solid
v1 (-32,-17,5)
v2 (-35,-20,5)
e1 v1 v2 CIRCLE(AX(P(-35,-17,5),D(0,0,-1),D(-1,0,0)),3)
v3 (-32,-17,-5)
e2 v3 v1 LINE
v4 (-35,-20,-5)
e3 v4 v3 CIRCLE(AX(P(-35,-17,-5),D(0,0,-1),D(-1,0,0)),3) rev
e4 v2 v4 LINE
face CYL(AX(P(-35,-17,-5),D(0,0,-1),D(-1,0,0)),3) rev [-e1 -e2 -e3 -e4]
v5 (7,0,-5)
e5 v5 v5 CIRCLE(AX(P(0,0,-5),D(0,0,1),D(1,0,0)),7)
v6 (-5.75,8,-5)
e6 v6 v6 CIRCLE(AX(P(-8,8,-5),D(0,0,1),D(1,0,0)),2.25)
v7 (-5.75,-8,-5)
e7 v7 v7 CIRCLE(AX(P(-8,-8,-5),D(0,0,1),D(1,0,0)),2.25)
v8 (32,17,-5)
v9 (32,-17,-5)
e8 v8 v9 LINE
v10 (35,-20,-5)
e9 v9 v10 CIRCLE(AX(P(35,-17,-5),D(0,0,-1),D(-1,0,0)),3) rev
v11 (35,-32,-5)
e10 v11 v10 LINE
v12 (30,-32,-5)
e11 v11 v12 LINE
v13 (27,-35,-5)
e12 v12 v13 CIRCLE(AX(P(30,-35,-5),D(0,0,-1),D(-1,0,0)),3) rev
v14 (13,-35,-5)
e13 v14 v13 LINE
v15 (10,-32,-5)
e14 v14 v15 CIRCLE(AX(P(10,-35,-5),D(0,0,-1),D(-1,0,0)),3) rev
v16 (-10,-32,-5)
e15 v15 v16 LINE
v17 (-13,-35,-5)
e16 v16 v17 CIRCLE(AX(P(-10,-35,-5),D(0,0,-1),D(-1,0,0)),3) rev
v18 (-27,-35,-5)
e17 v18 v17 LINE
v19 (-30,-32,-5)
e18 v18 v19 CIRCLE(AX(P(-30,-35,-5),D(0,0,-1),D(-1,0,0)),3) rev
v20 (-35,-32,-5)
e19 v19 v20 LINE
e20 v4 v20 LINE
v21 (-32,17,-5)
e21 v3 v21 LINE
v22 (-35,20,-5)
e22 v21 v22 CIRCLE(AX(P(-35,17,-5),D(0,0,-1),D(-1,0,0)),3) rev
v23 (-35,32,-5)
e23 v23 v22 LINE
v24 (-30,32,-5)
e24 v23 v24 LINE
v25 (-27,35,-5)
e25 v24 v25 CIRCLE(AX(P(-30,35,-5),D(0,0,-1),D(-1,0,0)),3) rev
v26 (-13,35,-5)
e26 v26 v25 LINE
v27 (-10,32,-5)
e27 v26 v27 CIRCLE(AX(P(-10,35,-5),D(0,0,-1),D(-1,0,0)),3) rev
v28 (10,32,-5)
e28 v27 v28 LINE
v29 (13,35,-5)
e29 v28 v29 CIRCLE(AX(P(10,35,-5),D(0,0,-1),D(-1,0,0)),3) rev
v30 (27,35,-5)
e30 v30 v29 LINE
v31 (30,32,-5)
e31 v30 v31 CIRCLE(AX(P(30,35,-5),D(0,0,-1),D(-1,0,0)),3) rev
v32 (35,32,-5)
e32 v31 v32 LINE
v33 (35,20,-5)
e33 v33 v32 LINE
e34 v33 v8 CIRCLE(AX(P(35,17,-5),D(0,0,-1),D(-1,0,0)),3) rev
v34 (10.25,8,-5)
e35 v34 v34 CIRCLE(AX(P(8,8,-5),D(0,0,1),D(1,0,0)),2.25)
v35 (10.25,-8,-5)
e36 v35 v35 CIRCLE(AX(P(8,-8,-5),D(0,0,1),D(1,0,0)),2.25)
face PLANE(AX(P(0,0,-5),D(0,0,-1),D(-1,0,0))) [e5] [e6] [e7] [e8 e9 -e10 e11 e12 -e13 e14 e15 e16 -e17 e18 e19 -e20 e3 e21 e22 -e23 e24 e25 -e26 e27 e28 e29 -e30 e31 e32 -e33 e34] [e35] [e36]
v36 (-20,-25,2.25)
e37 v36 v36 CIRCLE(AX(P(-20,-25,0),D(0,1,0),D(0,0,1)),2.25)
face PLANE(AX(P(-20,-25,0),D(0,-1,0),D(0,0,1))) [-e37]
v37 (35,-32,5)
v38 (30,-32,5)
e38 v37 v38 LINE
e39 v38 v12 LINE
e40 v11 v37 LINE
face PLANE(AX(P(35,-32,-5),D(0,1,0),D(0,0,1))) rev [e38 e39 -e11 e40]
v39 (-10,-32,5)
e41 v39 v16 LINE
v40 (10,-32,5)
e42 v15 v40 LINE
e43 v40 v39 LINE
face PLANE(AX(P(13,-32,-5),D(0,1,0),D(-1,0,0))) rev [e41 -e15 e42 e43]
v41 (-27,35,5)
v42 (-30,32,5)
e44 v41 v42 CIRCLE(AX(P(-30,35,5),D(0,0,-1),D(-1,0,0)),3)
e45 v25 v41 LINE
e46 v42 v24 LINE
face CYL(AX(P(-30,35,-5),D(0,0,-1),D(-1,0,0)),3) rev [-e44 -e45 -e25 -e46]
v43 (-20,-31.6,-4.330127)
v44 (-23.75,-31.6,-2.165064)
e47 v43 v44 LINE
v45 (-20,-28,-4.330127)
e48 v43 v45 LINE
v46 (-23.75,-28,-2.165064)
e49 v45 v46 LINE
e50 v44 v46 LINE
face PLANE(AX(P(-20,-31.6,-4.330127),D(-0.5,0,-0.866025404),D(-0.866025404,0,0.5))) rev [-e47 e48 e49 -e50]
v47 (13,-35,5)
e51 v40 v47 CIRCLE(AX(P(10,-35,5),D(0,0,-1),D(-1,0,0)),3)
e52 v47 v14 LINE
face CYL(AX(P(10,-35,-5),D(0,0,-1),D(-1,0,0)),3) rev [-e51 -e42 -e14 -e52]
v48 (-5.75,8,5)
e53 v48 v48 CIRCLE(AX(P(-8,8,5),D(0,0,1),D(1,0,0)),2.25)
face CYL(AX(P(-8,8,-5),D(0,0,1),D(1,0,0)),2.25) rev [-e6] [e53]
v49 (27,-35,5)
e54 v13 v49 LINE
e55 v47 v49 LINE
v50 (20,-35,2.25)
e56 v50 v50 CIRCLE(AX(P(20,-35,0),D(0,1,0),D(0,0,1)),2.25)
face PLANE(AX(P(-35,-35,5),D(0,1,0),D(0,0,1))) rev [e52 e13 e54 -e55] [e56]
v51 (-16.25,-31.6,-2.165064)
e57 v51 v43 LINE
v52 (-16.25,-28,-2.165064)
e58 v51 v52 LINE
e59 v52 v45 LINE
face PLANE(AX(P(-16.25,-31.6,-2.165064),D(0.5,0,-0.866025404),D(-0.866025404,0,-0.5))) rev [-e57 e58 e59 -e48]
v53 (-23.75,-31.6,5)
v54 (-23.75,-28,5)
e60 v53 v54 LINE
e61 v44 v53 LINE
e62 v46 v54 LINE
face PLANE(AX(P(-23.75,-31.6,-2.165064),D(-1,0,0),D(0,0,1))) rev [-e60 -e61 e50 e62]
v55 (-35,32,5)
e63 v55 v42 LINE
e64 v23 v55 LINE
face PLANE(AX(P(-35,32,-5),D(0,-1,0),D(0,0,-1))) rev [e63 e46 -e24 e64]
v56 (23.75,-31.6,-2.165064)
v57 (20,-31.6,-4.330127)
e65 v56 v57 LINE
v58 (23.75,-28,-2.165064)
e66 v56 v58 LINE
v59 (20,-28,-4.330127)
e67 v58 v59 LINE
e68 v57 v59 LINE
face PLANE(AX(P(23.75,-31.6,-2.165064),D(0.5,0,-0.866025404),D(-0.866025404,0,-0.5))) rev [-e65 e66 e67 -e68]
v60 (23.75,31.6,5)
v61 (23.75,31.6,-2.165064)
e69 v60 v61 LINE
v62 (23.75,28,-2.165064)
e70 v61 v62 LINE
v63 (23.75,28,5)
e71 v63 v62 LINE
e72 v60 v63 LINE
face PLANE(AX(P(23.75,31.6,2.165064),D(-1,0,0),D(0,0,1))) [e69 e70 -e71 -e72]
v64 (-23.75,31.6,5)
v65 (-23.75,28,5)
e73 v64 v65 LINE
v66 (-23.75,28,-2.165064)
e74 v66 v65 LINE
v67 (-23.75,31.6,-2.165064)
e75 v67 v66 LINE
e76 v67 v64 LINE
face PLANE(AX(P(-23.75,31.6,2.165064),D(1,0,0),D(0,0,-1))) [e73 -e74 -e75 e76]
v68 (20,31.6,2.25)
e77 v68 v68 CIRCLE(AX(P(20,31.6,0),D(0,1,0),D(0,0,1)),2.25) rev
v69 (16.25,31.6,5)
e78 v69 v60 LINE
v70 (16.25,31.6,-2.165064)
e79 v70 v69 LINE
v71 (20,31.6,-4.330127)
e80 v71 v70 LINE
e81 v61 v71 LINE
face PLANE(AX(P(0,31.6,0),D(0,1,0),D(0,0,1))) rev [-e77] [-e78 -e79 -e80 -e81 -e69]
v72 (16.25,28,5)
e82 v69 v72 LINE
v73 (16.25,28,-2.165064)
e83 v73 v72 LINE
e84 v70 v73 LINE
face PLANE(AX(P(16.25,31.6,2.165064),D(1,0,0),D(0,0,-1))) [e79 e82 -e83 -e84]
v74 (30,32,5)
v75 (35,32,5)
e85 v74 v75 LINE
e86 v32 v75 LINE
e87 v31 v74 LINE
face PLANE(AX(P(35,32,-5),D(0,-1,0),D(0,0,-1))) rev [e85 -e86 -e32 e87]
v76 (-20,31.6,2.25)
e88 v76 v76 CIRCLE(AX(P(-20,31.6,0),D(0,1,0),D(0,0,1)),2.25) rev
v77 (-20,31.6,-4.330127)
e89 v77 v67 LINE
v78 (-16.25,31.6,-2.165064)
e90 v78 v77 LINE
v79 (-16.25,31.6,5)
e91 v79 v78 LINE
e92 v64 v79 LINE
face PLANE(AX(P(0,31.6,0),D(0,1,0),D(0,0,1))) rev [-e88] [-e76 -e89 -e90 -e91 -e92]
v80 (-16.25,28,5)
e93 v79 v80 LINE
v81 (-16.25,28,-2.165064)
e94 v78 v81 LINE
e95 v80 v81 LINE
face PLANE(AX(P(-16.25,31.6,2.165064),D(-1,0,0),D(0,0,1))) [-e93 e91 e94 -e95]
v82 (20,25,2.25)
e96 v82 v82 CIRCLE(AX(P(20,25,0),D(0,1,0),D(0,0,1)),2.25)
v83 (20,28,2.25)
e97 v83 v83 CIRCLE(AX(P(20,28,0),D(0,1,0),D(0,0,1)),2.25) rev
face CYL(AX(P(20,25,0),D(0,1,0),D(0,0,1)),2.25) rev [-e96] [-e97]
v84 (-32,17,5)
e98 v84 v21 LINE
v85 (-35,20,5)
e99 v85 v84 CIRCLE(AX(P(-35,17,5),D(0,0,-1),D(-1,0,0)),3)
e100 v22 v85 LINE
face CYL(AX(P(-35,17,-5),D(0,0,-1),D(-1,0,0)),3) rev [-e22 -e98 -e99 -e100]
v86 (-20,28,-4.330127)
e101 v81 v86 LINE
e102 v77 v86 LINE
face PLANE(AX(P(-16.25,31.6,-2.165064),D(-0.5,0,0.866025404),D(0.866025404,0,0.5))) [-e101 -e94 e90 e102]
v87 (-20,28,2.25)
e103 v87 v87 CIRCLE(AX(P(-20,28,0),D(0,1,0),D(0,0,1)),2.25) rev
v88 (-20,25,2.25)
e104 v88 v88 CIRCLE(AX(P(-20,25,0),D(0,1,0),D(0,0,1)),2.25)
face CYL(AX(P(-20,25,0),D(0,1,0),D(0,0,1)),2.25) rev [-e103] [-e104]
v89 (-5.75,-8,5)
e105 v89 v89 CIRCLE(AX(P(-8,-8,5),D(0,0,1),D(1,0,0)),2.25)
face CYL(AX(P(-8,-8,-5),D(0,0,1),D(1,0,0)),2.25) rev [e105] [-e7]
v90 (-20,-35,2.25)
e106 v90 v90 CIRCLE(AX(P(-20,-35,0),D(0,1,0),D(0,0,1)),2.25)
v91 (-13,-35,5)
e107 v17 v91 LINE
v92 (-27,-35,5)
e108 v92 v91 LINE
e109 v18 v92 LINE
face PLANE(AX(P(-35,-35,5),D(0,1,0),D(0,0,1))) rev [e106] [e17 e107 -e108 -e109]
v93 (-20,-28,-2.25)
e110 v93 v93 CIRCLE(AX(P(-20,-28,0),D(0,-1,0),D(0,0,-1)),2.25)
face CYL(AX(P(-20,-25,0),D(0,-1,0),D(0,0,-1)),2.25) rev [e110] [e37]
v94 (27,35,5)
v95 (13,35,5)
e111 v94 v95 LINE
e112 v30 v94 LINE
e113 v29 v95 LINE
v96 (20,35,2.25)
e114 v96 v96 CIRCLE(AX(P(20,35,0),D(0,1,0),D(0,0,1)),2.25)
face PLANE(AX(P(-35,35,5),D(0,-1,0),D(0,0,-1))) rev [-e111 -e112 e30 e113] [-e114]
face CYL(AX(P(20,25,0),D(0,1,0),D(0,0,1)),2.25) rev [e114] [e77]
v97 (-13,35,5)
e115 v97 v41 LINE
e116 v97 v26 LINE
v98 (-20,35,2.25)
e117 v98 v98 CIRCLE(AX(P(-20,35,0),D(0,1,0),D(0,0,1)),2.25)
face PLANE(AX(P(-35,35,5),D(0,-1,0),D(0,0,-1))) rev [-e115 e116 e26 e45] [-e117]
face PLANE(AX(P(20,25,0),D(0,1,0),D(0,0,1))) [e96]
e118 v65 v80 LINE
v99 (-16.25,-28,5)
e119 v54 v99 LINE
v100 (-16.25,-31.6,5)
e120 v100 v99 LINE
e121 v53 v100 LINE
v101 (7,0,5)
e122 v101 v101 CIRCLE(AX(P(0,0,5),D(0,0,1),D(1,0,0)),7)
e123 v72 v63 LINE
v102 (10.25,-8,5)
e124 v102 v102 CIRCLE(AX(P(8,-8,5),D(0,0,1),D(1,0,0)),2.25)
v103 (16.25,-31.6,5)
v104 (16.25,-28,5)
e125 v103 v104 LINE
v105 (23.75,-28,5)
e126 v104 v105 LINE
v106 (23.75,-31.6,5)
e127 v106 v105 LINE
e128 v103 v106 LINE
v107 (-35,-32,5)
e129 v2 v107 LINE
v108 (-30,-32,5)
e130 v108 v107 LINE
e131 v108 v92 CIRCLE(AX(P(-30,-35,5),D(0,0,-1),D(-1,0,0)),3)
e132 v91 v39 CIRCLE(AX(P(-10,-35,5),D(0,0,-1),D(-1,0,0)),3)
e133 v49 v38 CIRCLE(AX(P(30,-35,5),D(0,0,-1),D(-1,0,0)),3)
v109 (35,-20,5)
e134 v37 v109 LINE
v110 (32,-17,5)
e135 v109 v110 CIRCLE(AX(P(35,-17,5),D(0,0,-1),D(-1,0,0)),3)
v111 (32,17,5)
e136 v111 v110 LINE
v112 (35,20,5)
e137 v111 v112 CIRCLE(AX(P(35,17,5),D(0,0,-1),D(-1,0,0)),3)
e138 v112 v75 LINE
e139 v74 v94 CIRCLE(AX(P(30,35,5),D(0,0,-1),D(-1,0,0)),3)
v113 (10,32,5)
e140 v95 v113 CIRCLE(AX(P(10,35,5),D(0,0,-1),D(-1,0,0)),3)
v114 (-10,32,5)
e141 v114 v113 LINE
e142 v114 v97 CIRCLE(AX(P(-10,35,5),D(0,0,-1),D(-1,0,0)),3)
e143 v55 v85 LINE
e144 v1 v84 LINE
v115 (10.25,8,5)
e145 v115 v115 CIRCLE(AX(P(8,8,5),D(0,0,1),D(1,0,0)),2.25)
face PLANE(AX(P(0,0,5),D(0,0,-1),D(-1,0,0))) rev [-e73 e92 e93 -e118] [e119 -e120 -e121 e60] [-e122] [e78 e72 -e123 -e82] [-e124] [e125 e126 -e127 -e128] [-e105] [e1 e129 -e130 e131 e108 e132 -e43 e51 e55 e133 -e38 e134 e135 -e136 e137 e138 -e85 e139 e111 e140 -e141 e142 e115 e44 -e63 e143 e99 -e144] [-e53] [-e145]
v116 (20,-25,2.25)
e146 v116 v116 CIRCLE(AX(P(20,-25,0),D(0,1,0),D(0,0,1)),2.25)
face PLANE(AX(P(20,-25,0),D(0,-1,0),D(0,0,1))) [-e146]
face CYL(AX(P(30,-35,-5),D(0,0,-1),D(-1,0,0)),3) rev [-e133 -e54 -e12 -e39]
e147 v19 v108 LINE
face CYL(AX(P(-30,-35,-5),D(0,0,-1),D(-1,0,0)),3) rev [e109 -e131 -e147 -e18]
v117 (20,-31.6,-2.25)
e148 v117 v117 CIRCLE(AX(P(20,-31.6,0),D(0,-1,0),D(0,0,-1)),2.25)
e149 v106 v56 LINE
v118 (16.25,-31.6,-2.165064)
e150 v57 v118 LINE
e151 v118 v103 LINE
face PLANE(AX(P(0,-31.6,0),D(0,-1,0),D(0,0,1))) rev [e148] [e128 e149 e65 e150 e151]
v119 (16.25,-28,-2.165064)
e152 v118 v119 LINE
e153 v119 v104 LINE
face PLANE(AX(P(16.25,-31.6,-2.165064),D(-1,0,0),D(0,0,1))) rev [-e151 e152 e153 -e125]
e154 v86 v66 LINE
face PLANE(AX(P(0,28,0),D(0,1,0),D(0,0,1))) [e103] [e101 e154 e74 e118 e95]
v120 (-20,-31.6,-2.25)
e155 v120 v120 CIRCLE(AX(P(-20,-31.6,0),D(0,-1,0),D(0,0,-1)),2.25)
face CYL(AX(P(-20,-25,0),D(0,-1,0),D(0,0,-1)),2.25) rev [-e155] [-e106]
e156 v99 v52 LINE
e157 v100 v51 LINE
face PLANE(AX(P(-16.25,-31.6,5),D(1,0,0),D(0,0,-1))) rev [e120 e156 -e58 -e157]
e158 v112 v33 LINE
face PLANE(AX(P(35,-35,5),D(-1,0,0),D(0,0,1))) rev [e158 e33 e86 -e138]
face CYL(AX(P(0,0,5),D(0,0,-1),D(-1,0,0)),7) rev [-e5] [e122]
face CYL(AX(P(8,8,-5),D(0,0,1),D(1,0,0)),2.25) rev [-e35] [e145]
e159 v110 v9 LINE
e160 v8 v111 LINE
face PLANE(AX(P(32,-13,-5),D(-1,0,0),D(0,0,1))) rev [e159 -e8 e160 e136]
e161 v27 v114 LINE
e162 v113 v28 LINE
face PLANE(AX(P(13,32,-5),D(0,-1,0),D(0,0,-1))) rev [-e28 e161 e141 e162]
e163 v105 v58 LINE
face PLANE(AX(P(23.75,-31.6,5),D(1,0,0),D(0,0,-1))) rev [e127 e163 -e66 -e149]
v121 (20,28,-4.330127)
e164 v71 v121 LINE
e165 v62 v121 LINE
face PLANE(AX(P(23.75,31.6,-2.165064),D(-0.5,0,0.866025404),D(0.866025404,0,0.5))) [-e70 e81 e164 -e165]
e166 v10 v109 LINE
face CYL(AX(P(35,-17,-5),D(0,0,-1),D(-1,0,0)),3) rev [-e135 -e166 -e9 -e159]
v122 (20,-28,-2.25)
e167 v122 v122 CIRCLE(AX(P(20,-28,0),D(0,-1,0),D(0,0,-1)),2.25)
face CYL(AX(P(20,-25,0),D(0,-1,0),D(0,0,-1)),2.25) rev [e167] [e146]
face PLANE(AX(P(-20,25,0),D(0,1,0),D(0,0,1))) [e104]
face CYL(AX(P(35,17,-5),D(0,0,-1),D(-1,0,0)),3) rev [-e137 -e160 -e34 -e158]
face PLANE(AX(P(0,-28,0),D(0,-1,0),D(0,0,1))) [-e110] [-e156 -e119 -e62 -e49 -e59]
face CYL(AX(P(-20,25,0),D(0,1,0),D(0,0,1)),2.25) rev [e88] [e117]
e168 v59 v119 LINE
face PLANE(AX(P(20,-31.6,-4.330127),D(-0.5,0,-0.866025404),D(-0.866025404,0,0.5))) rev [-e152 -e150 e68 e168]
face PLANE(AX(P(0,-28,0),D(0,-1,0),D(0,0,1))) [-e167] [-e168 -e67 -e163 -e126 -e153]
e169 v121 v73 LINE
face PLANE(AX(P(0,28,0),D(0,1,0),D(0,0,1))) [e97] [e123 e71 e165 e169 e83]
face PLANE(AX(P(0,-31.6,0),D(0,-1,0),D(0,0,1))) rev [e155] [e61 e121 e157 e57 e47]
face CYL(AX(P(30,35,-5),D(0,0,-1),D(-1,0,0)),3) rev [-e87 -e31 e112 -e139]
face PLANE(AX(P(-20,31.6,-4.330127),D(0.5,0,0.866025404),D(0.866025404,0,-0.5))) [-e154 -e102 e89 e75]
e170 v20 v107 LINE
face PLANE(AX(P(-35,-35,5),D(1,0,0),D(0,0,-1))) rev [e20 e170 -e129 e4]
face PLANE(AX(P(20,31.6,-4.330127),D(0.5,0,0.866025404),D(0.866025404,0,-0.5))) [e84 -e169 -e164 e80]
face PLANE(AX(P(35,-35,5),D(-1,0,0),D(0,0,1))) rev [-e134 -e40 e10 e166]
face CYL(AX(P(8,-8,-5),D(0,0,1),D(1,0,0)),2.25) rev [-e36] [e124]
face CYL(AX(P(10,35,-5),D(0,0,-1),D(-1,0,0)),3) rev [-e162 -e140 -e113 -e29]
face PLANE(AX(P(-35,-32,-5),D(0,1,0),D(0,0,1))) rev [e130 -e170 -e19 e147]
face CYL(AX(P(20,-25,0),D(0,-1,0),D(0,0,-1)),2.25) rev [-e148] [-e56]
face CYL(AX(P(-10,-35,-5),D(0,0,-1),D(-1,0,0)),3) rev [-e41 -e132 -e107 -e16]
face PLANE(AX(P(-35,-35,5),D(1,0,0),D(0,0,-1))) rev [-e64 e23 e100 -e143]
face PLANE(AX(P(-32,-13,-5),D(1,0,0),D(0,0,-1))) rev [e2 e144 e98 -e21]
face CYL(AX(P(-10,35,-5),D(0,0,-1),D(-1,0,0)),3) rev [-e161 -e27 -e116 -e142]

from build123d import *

# Parameters (mm, degrees)
CROQUIS1_W              = 70
CROQUIS1_H              = 70
CROQUIS1_R              = 7
SALIENTE_EXTRUIR1_DEPTH = 5
CROQUIS2_R              = 2.25
CROQUIS2_W              = 26
CROQUIS2_H              = 6
CROQUIS2_W_2            = 6
CROQUIS2_H_2            = 26
CORTAR_EXTRUIR1_DEPTH   = 51.497524692
CROQUIS4_R              = 2.25
CORTAR_EXTRUIR2_DEPTH   = 10
CORTAR_EXTRUIR3_DEPTH   = 3.6
CROQUIS6_W              = 8
CROQUIS6_H              = 3
CROQUIS6_W_2            = 6
CROQUIS6_H_2            = 40
CORTAR_EXTRUIR4_DEPTH   = 51.497524692
REDONDEO1_R             = 3


with BuildPart() as part:
    # Croquis1 → Saliente-Extruir1 (new, symmetric)
    with BuildSketch(Plane.XY):
        Rectangle(CROQUIS1_W, CROQUIS1_H)
        Circle(CROQUIS1_R, mode=Mode.SUBTRACT)
    extrude(amount=SALIENTE_EXTRUIR1_DEPTH, both=True)

    # Croquis2 → Cortar-Extruir1 (cut, through all)
    with BuildSketch(Plane.XY.offset(5)):
        with Locations((8, 8)):
            Circle(CROQUIS2_R)
        with Locations((8, -8)):
            Circle(CROQUIS2_R)
        with Locations((-8, -8)):
            Circle(CROQUIS2_R)
        with Locations((-8, 8)):
            Circle(CROQUIS2_R)
        with Locations((0, 35)):
            Rectangle(CROQUIS2_W, CROQUIS2_H)
        with Locations((-35, 0)):
            Rectangle(CROQUIS2_W_2, CROQUIS2_H_2)
        with Locations((35, 0)):
            Rectangle(CROQUIS2_W_2, CROQUIS2_H_2)
        with Locations((0, -35)):
            Rectangle(CROQUIS2_W, CROQUIS2_H)
    extrude(amount=-CORTAR_EXTRUIR1_DEPTH, mode=Mode.SUBTRACT)

    # Croquis4 → Cortar-Extruir2 (cut)
    with BuildSketch(Plane(origin=(0, 35, 0), x_dir=(1, 0, 0), z_dir=(0, 1, 0))):
        with Locations(Location((-20, 0, 0), (0, 0, 270))):
            Circle(CROQUIS4_R)
        with Locations(Location((20, 0, 0), (0, 0, 270))):
            Circle(CROQUIS4_R)
    cortar_extruir2 = extrude(amount=-CORTAR_EXTRUIR2_DEPTH, mode=Mode.SUBTRACT)

    # Croquis5 → Cortar-Extruir3 (cut)
    with BuildSketch(Plane(origin=(0, 28, 0), x_dir=(1, 0, 0), z_dir=(0, 1, 0))):
        Polygon((-23.75, -2.165063509), (-23.75, -5), (-16.25, -5), (-16.25, -2.165063509), (-16.25, 2.165063509), (-20, 4.330127019), (-23.75, 2.165063509), align=None)
        Polygon((16.25, 2.165063509), (16.25, -2.165063509), (16.25, -5), (23.75, -5), (23.75, -2.165063509), (23.75, 2.165063509), (20, 4.330127019), align=None)
    cortar_extruir3 = extrude(amount=CORTAR_EXTRUIR3_DEPTH, mode=Mode.SUBTRACT)

    # Simetría1: Cortar-Extruir2, Cortar-Extruir3 across plane
    add(cortar_extruir2.mirror(Plane.ZX), mode=Mode.SUBTRACT)
    add(cortar_extruir3.mirror(Plane.ZX), mode=Mode.SUBTRACT)

    # Croquis6 → Cortar-Extruir4 (cut, through all)
    with BuildSketch(Plane.XY.offset(5)):
        with Locations((-31, 33.5)):
            Rectangle(CROQUIS6_W, CROQUIS6_H)
        with Locations((31, 33.5)):
            Rectangle(CROQUIS6_W, CROQUIS6_H)
        with Locations((31, -33.5)):
            Rectangle(CROQUIS6_W, CROQUIS6_H)
        with Locations((-31, -33.5)):
            Rectangle(CROQUIS6_W, CROQUIS6_H)
        with Locations((-35, 0)):
            Rectangle(CROQUIS6_W_2, CROQUIS6_H_2)
        with Locations((35, 0)):
            Rectangle(CROQUIS6_W_2, CROQUIS6_H_2)
    extrude(amount=-CORTAR_EXTRUIR4_DEPTH, mode=Mode.SUBTRACT)

    # Redondeo1
    redondeo1_edges = [part.edges().sort_by_distance(p)[0] for p in [
        (27, -32, 0),
        (13, -32, 0),
        (-13, -32, 0),
        (-27, -32, 0),
        (-32, -20, 0),
        (-32, 20, 0),
        (32, -20, 0),
        (32, 20, 0),
        (27, 32, 0),
        (13, 32, 0),
        (-27, 32, 0),
        (-13, 32, 0),
    ]]
    fillet(redondeo1_edges, radius=REDONDEO1_R - 0.0001)  # a hair under: the kernel refuses the full size


solid = part.part
